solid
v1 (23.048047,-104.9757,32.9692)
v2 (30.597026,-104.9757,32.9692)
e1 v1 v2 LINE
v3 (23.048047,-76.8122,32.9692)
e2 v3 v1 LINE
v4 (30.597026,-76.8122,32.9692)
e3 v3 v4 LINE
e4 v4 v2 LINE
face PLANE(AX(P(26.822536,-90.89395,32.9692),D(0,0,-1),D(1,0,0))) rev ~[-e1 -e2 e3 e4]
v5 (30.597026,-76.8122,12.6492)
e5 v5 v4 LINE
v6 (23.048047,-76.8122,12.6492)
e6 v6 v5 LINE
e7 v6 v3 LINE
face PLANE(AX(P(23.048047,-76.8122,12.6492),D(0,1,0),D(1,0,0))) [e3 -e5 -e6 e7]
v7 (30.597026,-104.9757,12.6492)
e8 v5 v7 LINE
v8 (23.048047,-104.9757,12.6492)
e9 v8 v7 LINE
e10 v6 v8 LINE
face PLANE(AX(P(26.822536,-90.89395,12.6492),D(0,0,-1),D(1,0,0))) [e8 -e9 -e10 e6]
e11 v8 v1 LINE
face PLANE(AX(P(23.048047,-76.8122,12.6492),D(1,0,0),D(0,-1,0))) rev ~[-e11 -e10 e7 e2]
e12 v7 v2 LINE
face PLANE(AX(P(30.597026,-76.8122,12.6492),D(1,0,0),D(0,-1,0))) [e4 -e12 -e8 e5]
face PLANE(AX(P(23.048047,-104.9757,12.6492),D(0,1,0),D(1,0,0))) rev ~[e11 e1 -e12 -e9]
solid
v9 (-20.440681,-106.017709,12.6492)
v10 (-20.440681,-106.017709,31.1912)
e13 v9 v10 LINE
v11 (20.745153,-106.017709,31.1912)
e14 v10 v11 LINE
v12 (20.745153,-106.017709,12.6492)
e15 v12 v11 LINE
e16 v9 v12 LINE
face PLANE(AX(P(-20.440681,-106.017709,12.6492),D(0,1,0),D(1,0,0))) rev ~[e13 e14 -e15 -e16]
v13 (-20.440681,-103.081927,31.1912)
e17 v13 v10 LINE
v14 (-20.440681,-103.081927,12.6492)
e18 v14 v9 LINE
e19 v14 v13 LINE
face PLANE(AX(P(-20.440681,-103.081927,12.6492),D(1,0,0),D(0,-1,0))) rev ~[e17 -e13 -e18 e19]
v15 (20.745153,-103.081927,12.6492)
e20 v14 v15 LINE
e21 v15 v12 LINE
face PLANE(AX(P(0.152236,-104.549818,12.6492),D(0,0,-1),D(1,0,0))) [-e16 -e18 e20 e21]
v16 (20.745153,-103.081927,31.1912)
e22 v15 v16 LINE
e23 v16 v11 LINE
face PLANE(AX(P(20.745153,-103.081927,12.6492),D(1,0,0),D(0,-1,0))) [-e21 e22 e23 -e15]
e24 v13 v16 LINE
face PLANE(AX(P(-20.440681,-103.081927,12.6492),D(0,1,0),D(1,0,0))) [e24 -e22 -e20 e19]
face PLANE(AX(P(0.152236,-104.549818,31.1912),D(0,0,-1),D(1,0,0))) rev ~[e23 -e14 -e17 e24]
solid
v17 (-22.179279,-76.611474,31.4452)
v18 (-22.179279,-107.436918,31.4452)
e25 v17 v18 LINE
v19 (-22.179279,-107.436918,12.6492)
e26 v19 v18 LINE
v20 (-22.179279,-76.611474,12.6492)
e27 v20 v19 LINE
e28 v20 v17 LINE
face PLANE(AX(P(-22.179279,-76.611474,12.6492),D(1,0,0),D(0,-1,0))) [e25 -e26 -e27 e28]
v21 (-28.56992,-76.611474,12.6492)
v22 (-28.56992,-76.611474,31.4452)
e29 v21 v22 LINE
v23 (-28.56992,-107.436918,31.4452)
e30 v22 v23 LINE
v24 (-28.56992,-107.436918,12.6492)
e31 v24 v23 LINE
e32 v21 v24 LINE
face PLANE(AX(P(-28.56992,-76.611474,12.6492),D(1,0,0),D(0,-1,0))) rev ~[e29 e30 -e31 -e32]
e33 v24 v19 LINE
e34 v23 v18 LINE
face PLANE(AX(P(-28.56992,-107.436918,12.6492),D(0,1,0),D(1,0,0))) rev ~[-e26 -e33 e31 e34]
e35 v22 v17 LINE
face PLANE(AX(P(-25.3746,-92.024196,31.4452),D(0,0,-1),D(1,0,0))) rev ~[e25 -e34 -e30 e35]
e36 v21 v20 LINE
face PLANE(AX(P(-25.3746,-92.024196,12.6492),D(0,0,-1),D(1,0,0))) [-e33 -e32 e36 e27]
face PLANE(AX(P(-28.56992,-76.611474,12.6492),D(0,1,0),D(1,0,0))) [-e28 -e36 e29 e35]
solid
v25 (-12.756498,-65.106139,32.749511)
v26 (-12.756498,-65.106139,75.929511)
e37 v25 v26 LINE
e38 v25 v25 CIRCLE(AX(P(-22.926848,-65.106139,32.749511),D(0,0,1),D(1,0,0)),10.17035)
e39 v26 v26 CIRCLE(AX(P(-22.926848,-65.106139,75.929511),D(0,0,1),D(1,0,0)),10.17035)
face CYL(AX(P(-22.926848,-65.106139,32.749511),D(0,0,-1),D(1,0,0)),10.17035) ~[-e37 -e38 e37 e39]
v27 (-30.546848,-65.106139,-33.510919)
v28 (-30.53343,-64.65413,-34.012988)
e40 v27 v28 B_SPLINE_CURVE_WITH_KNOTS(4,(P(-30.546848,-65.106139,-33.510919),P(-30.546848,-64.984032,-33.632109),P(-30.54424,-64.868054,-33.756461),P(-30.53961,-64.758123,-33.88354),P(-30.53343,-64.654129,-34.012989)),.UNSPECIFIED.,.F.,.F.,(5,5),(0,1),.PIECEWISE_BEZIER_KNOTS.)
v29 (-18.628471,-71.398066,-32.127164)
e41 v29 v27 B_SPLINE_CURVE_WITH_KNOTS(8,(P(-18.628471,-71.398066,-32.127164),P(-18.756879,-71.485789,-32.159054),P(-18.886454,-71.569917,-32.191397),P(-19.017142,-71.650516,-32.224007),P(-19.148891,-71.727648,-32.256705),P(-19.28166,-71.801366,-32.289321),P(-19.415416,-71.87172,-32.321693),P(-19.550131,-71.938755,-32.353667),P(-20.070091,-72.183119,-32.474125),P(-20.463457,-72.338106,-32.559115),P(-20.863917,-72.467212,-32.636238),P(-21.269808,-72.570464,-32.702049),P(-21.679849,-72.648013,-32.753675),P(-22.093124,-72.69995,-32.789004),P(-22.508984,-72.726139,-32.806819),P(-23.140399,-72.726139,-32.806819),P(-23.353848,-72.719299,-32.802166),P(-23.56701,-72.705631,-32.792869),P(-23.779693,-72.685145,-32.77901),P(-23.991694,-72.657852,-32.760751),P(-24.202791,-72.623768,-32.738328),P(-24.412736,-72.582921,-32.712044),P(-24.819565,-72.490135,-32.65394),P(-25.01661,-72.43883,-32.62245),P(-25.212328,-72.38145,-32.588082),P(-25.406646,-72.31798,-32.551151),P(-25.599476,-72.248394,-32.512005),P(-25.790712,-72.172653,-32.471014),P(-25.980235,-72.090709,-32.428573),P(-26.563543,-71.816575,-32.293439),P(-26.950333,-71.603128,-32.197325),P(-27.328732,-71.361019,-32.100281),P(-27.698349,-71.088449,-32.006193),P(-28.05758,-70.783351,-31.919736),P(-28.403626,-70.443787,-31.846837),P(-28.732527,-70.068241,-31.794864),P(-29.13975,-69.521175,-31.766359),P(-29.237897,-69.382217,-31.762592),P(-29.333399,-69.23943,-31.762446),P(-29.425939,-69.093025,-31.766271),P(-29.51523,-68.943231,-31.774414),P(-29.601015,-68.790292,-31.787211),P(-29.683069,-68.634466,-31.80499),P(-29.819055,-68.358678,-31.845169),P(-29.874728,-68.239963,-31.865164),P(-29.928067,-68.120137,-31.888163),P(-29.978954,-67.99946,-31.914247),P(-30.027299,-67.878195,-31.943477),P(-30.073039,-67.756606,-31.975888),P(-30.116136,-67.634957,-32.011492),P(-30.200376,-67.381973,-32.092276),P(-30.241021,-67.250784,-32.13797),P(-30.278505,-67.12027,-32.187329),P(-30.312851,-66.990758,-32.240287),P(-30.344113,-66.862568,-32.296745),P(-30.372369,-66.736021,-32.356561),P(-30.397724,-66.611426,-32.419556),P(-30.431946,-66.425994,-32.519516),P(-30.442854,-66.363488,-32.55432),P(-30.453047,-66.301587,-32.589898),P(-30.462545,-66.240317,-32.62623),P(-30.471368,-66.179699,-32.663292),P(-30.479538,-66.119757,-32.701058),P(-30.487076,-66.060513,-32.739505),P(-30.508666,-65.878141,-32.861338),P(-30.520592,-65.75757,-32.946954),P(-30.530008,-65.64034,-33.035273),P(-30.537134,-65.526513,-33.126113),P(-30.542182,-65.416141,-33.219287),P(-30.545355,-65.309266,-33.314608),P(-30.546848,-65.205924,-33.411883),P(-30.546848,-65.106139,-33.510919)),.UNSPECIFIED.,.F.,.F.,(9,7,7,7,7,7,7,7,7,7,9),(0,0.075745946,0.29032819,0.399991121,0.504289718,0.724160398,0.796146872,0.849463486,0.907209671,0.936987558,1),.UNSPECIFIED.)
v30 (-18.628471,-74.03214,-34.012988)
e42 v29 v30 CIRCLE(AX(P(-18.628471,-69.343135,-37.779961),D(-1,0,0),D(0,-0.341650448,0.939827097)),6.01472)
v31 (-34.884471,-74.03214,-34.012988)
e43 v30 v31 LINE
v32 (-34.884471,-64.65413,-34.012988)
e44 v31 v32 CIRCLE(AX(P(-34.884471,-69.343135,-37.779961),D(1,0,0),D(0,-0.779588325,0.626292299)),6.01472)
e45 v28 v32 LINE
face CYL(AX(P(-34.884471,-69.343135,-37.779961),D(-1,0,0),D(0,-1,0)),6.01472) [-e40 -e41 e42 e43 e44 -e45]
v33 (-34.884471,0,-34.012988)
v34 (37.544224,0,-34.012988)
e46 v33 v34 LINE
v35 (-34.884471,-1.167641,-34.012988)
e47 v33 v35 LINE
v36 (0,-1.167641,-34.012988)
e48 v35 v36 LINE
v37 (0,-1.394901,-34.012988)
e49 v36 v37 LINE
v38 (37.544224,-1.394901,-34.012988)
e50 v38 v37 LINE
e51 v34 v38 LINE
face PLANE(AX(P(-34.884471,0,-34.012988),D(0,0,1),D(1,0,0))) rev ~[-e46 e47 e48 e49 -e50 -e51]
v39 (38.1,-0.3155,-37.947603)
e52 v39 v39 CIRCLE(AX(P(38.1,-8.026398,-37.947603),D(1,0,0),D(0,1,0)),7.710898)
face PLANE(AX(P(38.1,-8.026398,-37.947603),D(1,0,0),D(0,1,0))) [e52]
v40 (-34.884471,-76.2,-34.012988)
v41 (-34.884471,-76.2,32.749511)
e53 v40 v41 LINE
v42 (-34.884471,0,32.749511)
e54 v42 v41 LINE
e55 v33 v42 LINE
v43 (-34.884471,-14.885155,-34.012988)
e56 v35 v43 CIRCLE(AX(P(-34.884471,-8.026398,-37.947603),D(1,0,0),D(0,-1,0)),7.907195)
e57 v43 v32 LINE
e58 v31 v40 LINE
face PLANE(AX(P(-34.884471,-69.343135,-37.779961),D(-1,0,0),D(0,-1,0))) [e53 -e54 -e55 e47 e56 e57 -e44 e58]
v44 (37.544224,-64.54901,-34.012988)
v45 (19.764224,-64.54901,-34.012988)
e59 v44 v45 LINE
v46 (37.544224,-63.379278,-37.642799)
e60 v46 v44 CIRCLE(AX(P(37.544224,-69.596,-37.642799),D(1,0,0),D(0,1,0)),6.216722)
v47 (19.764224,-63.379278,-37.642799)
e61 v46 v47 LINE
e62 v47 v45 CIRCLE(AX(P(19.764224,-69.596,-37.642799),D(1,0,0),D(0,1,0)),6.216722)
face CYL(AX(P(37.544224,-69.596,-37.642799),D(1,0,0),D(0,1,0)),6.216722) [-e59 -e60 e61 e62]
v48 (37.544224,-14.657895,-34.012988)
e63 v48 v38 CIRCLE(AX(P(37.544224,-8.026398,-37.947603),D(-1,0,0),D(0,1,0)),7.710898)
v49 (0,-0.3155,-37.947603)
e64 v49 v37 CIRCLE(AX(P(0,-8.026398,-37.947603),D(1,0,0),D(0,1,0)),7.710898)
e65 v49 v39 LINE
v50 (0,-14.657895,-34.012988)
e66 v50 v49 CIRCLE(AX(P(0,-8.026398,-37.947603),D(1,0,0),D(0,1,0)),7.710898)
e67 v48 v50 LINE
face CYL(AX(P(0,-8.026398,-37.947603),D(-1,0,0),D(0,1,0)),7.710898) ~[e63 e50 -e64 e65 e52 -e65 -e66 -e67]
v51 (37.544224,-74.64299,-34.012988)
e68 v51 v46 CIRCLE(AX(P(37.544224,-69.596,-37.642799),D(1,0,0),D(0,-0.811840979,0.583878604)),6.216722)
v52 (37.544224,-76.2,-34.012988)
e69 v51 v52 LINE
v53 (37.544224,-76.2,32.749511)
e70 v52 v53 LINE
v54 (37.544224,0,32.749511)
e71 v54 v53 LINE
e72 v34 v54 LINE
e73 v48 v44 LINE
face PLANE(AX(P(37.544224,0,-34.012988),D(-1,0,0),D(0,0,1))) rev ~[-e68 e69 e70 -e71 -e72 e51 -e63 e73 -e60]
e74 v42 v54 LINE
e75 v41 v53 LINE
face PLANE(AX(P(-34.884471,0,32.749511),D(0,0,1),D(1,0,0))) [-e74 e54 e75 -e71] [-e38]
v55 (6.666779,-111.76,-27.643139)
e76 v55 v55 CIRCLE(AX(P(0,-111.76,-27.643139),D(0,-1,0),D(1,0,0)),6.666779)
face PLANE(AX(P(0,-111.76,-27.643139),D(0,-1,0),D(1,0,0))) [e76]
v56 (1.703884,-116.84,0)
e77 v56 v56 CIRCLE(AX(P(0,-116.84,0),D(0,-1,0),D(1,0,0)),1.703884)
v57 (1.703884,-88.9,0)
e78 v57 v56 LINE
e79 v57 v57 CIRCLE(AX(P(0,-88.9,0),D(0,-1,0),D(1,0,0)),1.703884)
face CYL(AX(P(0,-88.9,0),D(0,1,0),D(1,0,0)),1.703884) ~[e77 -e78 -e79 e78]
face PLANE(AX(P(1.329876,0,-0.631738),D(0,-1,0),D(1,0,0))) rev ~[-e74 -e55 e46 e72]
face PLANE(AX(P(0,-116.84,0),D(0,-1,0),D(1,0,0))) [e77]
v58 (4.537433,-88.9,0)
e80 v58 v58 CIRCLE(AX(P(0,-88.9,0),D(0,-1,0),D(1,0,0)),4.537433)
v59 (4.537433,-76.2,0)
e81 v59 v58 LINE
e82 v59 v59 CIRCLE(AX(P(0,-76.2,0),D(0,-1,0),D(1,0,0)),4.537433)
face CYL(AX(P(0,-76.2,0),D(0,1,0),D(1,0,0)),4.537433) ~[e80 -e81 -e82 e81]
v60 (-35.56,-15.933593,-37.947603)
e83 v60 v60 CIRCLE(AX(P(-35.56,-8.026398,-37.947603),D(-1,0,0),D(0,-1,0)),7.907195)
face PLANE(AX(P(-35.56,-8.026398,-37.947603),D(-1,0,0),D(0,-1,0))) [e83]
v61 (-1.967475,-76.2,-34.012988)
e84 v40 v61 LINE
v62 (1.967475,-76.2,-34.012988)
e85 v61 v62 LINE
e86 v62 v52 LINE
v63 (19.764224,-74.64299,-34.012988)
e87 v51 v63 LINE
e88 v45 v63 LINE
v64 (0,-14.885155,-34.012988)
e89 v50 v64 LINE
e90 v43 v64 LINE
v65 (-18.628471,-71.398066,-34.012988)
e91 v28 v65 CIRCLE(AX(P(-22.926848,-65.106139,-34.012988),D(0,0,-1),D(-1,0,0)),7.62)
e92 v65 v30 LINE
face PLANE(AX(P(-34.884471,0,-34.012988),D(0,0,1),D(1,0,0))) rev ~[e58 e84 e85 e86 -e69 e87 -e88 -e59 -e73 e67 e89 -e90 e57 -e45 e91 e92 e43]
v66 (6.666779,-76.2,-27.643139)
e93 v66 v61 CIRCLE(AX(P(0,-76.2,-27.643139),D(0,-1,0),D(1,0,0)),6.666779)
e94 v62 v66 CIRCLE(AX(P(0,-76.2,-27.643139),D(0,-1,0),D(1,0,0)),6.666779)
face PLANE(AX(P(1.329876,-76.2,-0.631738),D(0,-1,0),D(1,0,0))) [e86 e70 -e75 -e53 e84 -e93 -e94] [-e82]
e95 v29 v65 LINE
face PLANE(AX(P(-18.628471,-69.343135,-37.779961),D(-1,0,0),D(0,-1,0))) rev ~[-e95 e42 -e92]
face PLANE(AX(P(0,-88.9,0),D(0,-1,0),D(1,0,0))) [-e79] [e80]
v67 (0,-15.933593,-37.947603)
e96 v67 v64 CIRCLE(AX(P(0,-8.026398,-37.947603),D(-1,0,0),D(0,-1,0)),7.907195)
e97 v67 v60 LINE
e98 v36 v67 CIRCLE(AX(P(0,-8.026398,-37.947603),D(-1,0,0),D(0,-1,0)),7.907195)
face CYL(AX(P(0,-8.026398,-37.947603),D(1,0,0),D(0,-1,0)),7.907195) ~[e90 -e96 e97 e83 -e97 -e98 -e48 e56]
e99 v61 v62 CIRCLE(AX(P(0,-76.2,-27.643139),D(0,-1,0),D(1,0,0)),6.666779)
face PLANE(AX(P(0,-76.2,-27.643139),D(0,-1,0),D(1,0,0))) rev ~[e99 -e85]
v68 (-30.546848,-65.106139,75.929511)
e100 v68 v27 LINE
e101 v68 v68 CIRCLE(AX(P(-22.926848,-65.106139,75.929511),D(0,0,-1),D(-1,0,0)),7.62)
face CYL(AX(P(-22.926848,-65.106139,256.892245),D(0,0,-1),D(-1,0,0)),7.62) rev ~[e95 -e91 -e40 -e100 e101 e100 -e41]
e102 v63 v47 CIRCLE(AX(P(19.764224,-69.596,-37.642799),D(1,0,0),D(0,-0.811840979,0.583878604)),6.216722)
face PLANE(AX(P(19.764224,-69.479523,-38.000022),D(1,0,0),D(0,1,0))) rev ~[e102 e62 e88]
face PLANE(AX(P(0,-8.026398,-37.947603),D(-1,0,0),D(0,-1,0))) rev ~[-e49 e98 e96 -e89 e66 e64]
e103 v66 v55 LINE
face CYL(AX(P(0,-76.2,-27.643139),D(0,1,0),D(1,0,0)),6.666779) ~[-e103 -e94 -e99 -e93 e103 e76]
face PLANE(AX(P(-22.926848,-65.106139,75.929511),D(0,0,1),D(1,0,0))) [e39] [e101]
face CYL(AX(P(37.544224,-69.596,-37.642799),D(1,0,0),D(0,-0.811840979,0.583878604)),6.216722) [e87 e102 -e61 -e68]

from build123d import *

# Parameters (mm, degrees)
F0_W      = 72.4286958575
F0_H      = 66.7624995112
F1_DEPTH  = 76.2
F2_R      = 10.1703504115
F3_DEPTH  = 43.18
F4_R      = 6.6667791351
F5_DEPTH  = 35.56
F6_R      = 7.7108976591
F7_DEPTH  = 38.1
F8_R      = 7.9071951907
F9_DEPTH  = 35.56
F11_DEPTH = 17.78
F14_R     = 4.5374330057
F15_DEPTH = 12.7
F20_W     = 6.3906405121
F20_H     = 30.8254435658
F21_DEPTH = 18.796
F22_W     = 7.5489785522
F22_H     = 28.1635001302
F23_DEPTH = 20.32
F24_W     = 41.1858335137
F24_H     = 2.9357820749
F25_DEPTH = 18.542
F27_D     = 15.24
F28_R     = 6.0147196054
F29_DEPTH = 16.256
F30_R     = 1.7038843718
F31_DEPTH = 27.94


with BuildPart() as f1:
    # F0 (on Front) → F1 (new body)
    with BuildSketch(Plane.XZ):
        with Locations((1.3298764825, -0.6317384541)):
            Rectangle(F0_W, F0_H)
    extrude(amount=F1_DEPTH)

    # F2 (on face) → F3 (join)
    with BuildSketch(Plane.XY.offset(32.7495113015)):
        with Locations((-22.9268483818, -65.106138587)):
            Circle(F2_R)
    extrude(amount=F3_DEPTH)

    # F4 (on face) → F5 (join)
    with BuildSketch(Plane.XZ.offset(76.2)):
        with Locations((0, -27.6431385428)):
            Circle(F4_R)
    extrude(amount=F5_DEPTH)

    # F6 (on Right) → F7 (join)
    with BuildSketch(Plane.YZ):
        with Locations((-8.026397787, -37.9476025701)):
            Circle(F6_R)
    extrude(amount=F7_DEPTH)

    # F8 (on face) → F9 (join)
    with BuildSketch(Plane(origin=(0, 0, 0), x_dir=(0, -1, 0), z_dir=(-1, 0, 0))):
        with Locations((8.026397787, -37.9476025701)):
            Circle(F8_R)
    extrude(amount=F9_DEPTH)

    # F10 (on face) → F11 (join)
    with BuildSketch(Plane.YZ.offset(37.5442244112)):
        with BuildLine():
            ThreePointArc((-74.6429898938, -34.0129882097), (-71.5028168985, -43.5598665716), (-63.3792777676, -37.6427993178))
            ThreePointArc((-63.3792777676, -37.6427993178), (-63.678932762, -35.735982435), (-64.5490101377, -34.0129882097))
            Line((-64.5490101377, -34.0129882097), (-74.6429898938, -34.0129882097))
        make_face()
    extrude(amount=-F11_DEPTH)

    # F14 (on face) → F15 (join)
    with BuildSketch(Plane.XZ.offset(76.2)):
        Circle(F14_R)
    extrude(amount=F15_DEPTH)

    # F27 (through all)
    with Locations(Plane.XY.offset(75.9295113015)):
        with Locations((-22.9268483818, -65.106138587)):
            Hole(F27_D / 2)

    # F28 (on face) → F29 (join)
    with BuildSketch(Plane(origin=(-34.8844714463, 0, 0), x_dir=(0, -1, 0), z_dir=(-1, 0, 0))):
        with Locations((69.3431347609, -37.7799607813)):
            Circle(F28_R)
    extrude(amount=-F29_DEPTH)

    # F30 (on face) → F31 (join)
    with BuildSketch(Plane.XZ.offset(88.9)):
        Circle(F30_R)
    extrude(amount=F31_DEPTH)


with BuildPart() as f21:
    # F20 (on face) → F21 (new body)
    with BuildSketch(Plane(origin=(0, 0, 12.6491999254), x_dir=(1, 0, 0), z_dir=(0, 0, -1))):
        with Locations((-25.3745997325, 92.0241959393)):
            Rectangle(F20_W, F20_H)
    extrude(amount=-F21_DEPTH)


with BuildPart() as f23:
    # F22 (on face) → F23 (new body)
    with BuildSketch(Plane(origin=(0, 0, 12.6491999254), x_dir=(1, 0, 0), z_dir=(0, 0, -1))):
        with Locations((26.8225362524, 90.8939503133)):
            Rectangle(F22_W, F22_H)
    extrude(amount=-F23_DEPTH)


with BuildPart() as f25:
    # F24 (on face) → F25 (new body)
    with BuildSketch(Plane(origin=(0, 0, 12.6491999254), x_dir=(1, 0, 0), z_dir=(0, 0, -1))):
        with Locations((0.1522358507, 104.5498177409)):
            Rectangle(F24_W, F24_H)
    extrude(amount=-F25_DEPTH)


solid = Compound([f1.part, f21.part, f23.part, f25.part])
